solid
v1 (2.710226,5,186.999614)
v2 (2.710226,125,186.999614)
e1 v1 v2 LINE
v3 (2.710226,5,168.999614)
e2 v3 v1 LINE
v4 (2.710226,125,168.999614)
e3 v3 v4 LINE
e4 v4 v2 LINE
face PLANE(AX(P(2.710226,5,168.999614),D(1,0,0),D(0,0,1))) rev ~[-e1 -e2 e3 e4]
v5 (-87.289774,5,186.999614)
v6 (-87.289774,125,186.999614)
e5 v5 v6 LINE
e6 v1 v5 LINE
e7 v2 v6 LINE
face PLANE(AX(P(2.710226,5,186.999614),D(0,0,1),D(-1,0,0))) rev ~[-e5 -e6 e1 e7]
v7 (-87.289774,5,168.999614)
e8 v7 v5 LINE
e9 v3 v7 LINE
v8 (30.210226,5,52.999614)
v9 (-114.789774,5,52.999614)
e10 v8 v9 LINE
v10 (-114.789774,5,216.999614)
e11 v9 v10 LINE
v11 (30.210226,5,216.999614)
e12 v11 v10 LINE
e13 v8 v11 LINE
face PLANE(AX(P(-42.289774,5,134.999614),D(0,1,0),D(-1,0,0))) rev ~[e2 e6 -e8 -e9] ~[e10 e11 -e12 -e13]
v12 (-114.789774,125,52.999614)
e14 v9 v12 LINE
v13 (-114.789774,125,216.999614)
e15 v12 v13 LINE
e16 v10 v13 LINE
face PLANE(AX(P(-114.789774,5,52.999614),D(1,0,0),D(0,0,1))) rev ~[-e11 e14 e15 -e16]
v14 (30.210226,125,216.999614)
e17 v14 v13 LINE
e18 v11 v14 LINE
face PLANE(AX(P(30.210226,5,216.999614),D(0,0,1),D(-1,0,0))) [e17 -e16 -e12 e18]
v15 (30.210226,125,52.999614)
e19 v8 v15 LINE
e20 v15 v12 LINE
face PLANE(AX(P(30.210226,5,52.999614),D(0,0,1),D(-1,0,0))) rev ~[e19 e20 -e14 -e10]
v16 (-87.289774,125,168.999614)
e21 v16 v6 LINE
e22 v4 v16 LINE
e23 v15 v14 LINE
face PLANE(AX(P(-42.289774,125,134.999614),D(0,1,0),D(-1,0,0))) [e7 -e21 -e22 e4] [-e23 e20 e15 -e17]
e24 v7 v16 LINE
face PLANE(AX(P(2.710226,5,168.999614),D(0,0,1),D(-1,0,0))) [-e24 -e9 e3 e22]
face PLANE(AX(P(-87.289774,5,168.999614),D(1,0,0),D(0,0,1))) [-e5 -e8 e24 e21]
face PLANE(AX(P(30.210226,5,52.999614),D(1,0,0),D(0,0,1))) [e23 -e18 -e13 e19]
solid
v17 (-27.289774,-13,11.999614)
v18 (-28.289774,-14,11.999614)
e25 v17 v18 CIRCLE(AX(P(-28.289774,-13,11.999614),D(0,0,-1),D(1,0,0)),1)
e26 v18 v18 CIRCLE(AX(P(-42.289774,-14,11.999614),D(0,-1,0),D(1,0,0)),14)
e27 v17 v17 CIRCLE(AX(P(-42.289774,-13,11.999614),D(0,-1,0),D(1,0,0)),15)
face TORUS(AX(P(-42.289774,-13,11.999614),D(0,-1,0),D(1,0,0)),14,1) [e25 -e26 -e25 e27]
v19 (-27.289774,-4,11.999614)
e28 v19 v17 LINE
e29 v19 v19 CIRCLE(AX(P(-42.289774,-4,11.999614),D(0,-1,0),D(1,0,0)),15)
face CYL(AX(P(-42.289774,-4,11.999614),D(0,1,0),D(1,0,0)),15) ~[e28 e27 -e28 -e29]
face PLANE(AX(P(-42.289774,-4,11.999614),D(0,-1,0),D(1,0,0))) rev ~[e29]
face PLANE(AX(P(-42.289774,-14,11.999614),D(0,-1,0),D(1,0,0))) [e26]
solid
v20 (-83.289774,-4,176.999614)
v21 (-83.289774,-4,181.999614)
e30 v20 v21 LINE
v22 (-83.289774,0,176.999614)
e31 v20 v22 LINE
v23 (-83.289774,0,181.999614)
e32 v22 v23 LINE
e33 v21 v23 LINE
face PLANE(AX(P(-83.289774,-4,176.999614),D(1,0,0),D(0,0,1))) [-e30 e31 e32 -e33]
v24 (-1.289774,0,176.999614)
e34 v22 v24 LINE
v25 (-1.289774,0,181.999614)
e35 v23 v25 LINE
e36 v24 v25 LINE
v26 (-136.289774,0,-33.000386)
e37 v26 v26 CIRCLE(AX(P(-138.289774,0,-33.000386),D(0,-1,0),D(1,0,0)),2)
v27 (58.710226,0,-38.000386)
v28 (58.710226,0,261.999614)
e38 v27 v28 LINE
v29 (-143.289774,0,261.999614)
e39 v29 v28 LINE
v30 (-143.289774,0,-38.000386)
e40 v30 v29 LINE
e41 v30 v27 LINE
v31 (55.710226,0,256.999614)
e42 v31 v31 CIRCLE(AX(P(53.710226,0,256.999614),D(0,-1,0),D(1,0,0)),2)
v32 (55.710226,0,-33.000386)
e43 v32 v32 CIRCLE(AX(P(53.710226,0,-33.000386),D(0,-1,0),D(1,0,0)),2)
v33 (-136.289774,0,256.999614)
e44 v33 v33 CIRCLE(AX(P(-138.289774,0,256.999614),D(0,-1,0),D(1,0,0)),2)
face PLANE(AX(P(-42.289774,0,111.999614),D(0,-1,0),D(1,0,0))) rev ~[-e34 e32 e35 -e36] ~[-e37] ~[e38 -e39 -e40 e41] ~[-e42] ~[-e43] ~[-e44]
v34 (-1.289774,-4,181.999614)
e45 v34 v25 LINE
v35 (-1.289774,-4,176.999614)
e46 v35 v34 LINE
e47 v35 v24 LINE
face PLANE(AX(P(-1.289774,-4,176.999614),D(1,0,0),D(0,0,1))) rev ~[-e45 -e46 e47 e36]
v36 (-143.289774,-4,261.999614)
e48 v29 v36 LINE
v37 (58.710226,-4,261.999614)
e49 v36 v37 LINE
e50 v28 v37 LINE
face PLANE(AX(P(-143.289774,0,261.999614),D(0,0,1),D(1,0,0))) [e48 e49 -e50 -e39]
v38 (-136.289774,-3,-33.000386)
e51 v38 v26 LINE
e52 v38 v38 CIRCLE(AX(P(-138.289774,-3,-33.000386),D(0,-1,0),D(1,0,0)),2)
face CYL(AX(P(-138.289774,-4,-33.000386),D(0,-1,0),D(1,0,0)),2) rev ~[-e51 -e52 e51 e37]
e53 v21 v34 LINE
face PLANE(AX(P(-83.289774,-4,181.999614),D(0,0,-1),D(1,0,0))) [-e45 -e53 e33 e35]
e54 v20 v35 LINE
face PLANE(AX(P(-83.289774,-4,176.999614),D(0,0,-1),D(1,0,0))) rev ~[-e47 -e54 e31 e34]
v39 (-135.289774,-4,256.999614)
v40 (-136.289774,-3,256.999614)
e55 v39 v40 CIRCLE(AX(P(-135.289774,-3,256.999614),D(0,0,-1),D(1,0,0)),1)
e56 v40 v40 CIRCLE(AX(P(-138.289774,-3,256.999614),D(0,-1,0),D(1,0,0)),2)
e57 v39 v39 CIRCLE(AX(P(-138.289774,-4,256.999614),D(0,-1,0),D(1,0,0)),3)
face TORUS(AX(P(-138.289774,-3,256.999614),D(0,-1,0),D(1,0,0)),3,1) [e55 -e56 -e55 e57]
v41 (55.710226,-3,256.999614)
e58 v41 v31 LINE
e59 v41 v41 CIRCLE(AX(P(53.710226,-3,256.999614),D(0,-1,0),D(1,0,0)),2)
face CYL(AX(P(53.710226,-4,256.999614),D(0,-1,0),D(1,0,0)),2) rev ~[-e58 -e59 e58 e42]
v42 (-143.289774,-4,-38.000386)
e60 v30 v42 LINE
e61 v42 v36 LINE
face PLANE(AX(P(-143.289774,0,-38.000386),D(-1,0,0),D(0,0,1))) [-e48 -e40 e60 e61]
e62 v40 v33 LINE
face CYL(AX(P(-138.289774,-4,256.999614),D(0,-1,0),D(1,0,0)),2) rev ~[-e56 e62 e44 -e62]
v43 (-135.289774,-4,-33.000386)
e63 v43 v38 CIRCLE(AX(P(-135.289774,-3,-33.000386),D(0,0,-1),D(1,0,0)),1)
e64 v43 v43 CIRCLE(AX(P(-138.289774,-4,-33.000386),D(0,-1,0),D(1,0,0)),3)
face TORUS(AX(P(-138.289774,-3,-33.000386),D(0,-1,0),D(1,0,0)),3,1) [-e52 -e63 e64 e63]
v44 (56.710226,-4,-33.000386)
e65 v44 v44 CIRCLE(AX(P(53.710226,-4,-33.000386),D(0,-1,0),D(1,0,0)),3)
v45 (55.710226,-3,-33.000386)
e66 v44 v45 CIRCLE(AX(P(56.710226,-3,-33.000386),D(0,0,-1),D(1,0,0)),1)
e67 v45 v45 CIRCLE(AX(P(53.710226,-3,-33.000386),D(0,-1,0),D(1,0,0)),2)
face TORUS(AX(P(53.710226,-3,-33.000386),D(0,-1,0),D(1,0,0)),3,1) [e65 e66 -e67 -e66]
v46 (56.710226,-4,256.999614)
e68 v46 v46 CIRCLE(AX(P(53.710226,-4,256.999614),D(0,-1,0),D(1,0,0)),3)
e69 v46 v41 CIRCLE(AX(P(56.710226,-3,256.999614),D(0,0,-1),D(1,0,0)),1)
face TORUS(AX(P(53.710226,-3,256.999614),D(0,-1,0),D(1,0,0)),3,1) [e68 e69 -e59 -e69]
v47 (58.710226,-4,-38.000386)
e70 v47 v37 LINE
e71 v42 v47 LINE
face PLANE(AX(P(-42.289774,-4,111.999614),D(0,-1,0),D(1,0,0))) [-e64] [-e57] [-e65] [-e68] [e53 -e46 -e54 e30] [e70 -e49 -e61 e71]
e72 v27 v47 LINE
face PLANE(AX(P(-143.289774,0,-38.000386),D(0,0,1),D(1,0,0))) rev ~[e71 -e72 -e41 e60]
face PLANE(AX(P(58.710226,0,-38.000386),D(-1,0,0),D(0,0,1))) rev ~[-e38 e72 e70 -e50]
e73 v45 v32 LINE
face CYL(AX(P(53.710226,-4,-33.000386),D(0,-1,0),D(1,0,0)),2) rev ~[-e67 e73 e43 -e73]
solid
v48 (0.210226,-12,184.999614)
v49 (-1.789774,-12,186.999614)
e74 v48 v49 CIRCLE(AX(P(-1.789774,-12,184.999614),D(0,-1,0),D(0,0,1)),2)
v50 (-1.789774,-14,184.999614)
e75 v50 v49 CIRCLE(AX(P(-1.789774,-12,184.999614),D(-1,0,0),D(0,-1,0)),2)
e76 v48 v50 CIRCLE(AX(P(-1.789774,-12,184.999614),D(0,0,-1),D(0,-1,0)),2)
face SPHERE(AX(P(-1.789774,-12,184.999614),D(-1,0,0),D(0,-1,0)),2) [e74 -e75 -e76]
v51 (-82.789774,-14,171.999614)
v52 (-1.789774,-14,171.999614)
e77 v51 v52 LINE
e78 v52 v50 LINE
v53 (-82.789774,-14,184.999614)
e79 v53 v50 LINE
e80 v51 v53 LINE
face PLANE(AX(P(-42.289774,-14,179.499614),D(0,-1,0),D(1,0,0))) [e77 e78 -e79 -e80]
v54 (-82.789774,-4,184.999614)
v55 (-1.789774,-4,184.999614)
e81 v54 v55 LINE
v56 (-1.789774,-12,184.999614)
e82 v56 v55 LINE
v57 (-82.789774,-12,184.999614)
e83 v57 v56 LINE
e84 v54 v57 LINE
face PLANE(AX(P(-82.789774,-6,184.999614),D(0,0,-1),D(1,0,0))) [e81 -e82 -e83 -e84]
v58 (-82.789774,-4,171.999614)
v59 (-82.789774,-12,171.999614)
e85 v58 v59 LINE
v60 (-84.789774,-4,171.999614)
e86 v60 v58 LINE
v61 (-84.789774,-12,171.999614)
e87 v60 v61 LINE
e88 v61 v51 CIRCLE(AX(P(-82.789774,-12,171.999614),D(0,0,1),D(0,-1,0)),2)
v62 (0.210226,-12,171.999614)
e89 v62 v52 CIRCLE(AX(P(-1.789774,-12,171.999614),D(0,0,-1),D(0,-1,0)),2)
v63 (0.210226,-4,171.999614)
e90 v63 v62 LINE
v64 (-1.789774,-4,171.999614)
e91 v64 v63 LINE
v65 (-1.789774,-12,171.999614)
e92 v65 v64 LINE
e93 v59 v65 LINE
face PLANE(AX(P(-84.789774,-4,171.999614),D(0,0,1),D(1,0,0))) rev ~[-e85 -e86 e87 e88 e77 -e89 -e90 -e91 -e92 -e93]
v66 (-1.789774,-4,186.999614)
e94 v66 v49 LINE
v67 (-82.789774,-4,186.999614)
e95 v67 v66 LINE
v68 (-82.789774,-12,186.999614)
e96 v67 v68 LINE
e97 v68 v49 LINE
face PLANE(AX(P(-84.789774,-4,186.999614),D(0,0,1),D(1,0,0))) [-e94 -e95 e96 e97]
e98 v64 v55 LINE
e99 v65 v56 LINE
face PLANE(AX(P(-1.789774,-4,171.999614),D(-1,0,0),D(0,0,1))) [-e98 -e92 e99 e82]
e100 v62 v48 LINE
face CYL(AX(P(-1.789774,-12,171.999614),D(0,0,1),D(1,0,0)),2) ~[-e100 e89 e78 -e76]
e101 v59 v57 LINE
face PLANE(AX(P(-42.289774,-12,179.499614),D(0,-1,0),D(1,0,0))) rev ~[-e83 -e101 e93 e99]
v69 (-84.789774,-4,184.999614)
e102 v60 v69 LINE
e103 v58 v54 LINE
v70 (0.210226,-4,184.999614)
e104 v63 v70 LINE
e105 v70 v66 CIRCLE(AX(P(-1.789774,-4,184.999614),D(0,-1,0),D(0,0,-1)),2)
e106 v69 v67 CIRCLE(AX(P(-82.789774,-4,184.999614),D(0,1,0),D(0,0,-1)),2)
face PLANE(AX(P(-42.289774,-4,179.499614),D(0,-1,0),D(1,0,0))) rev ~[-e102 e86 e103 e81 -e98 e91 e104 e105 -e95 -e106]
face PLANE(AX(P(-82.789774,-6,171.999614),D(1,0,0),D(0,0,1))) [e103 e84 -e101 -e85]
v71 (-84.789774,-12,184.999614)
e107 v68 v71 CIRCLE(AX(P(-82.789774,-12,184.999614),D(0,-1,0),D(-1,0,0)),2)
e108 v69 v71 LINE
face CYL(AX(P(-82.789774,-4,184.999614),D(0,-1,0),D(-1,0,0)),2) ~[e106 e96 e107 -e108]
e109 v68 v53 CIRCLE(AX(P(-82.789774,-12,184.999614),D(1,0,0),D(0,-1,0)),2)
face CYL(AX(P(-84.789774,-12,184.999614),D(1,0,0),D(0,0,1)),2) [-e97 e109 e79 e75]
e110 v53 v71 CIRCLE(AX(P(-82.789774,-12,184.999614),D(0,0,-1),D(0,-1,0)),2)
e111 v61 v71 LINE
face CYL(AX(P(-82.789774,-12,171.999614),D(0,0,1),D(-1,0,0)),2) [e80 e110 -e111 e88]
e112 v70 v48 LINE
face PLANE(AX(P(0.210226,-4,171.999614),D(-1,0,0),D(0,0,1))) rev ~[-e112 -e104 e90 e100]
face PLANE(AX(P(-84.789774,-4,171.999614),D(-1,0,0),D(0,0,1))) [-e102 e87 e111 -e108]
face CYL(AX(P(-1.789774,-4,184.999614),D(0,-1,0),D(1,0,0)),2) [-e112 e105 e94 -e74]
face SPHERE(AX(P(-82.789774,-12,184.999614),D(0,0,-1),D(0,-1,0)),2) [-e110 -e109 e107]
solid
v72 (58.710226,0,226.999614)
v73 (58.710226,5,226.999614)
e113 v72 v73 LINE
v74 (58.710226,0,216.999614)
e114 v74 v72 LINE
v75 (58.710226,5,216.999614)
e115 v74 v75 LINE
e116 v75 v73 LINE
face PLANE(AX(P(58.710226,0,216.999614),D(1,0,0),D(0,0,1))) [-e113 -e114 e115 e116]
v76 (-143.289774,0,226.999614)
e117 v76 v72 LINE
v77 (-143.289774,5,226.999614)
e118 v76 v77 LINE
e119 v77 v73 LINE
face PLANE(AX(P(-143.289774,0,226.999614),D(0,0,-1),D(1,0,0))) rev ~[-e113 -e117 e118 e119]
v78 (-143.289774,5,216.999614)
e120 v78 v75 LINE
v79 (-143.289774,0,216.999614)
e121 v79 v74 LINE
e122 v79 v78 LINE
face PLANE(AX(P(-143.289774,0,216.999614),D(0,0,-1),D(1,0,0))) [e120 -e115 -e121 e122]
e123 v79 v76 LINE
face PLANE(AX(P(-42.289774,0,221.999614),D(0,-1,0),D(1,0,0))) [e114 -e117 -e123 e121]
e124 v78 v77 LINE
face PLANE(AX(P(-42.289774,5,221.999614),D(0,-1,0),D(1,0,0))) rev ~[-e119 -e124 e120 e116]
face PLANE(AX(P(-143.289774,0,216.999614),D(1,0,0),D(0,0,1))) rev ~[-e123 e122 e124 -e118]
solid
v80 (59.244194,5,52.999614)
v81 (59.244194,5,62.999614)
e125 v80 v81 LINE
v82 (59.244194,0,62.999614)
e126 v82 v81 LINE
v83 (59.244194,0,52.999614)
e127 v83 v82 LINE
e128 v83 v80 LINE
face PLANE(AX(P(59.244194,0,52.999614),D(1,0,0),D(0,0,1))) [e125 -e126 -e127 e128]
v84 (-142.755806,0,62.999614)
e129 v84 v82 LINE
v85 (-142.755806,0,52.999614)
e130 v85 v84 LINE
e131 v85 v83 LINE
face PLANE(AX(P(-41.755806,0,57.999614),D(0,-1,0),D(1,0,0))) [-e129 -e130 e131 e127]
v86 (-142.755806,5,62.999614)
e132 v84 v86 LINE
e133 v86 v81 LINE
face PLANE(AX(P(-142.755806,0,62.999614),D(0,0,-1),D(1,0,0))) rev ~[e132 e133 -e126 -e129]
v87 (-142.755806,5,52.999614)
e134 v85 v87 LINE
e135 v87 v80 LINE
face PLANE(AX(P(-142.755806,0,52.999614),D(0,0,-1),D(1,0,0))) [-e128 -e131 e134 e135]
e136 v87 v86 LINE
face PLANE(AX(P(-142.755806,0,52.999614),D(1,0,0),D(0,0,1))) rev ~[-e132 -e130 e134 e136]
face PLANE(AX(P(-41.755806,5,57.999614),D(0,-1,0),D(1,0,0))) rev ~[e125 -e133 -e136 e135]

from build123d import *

# Parameters (mm, degrees)
F0_W      = 202
F0_H      = 300
F1_DEPTH  = 4
F2_R      = 2
F3_DEPTH  = 5
F4_R      = 15
F5_DEPTH  = 10
F6_R      = 1
F7_W      = 85
F7_H      = 15
F8_DEPTH  = 10
F9_R      = 2
F10_T     = 2
F11_W     = 81
F11_H     = 13
F12_DEPTH = 10
F2_W      = 82
F2_H      = 5
F13_DEPTH = 25
F14_R     = 1
F15_W     = 202
F15_H     = 10
F16_DEPTH = 5
F17_W     = 145
F17_H     = 164
F17_W_2   = 90
F17_H_2   = 18
F18_DEPTH = 120


# Not quite as in the source:
# - a shell that OpenCascade refuses in one call is made with other operations: the cavity is built on its own and cut out
# - a feature names something its author has since deleted; it is built from what else it names


with BuildPart() as f1:
    # F0 (on Front) → F1 (new body)
    with BuildSketch(Plane.XZ):
        with Locations((-42.2897736542, 111.9996137917)):
            Rectangle(F0_W, F0_H)
    extrude(amount=F1_DEPTH)

    # F2 (on face) → F3 (cut)
    with BuildSketch(Plane.XZ.offset(4)):
        with Locations((-138.2897736542, -33.0003862083)):
            Circle(F2_R)
        with Locations((-138.2897736542, 256.9996137917)):
            Circle(F2_R)
        with Locations((53.7102263458, 256.9996137917)):
            Circle(F2_R)
        with Locations((53.7102263458, -33.0003862083)):
            Circle(F2_R)
    extrude(amount=-F3_DEPTH, mode=Mode.SUBTRACT)

    # F2 (on face) → F13 (cut)
    with BuildSketch(Plane.XZ.offset(4)):
        with Locations((-42.2897736542, 179.4996137917)):
            Rectangle(F2_W, F2_H)
    extrude(amount=-F13_DEPTH, mode=Mode.SUBTRACT)

    # F14
    f14_edges = [f1.edges().sort_by_distance(p)[0] for p in [
        (-140.289774, -4, 256.999614),
        (-140.289774, -4, -33.000386),
        (51.710226, -4, -33.000386),
        (51.710226, -4, 256.999614),
    ]]
    fillet(f14_edges, radius=F14_R)


with BuildPart() as f5:
    # F4 (on face) → F5 (new body)
    with BuildSketch(Plane.XZ.offset(4)):
        with Locations((-42.2897736542, 11.9996137917)):
            Circle(F4_R)
    extrude(amount=F5_DEPTH)

    # F6
    f6_edges = [f5.edges().sort_by_distance(p)[0] for p in [
        (-57.289774, -14, 11.999614),
    ]]
    fillet(f6_edges, radius=F6_R)


with BuildPart() as f8:
    # F7 (on face) → F8 (new body)
    with BuildSketch(Plane.XZ.offset(4)):
        with Locations((-42.2897736542, 179.4996137917)):
            Rectangle(F7_W, F7_H)
    extrude(amount=F8_DEPTH)

    # F9
    f9_edges = [f8.edges().sort_by_distance(p)[0] for p in [
        (-84.789774, -14, 179.499614),
        (-42.289774, -14, 186.999614),
        (0.210226, -14, 179.499614),
        (0.210226, -9, 186.999614),
        (-84.789774, -9, 186.999614),
    ]]
    fillet(f9_edges, radius=F9_R)

    # F10: shell of thickness 2, made by hand


with BuildPart() as f10_core1:
    # F10_t2: copy of F8
    add(f8.part)

    # the walls: a layer under each face that stays
    f10_faces = [f10_core1.faces().sort_by_distance(p)[0] for p in [
        (-42.2897736542, -8, 186.9996137917),
        (-42.2897736542, -4, 179.4996137917),
        (0.2102263458, -8, 178.4996137917),
        (-84.7897736542, -8, 178.4996137917),
        (-42.2897736542, -14, 178.4996137917),
    ]]
    thicken(f10_faces, amount=-F10_T, mode=Mode.SUBTRACT)


with BuildPart() as f8_1:
    add(f8.part)

    # what is left inside the walls is the cavity
    f10_cavity = [f10_core1.part.solids().sort_by_distance(p)[0] for p in [
        (-42.289774, -6.02, 176.332947),
    ]]
    add(f10_cavity, mode=Mode.SUBTRACT)

    # F11 (on face) → F12 (cut)
    with BuildSketch(Plane.XZ.offset(6)):
        with Locations((-42.2897736542, 178.4996137917)):
            Rectangle(F11_W, F11_H)
    extrude(amount=-F12_DEPTH, mode=Mode.SUBTRACT)


with BuildPart() as f16:
    # F15 (on face) → F16 (new body)
    with BuildSketch(Plane.XZ):
        with Locations((-42.2897736542, 221.9996137917)):
            Rectangle(F15_W, F15_H)
    extrude(amount=-F16_DEPTH)


with BuildPart() as f16b:
    # F15 (on face) → F16, piece 2 (new body)
    with BuildSketch(Plane.XZ):
        with Locations((-41.7558064461, 57.9996137917)):
            Rectangle(F15_W, F15_H)
    extrude(amount=-F16_DEPTH)


with BuildPart() as f18:
    # F17 (on face) → F18 (new body)
    with BuildSketch(Plane(origin=(0, 5, 0), x_dir=(-1, 0, 0), z_dir=(0, 1, 0))):
        with Locations((42.2897736542, 134.9996137917)):
            Rectangle(F17_W, F17_H)
        with Locations((42.2897736542, 177.9996137917)):
            Rectangle(F17_W_2, F17_H_2, mode=Mode.SUBTRACT)
    extrude(amount=F18_DEPTH)


solid = Compound([f1.part, f5.part, f8_1.part, f16.part, f16b.part, f18.part])
